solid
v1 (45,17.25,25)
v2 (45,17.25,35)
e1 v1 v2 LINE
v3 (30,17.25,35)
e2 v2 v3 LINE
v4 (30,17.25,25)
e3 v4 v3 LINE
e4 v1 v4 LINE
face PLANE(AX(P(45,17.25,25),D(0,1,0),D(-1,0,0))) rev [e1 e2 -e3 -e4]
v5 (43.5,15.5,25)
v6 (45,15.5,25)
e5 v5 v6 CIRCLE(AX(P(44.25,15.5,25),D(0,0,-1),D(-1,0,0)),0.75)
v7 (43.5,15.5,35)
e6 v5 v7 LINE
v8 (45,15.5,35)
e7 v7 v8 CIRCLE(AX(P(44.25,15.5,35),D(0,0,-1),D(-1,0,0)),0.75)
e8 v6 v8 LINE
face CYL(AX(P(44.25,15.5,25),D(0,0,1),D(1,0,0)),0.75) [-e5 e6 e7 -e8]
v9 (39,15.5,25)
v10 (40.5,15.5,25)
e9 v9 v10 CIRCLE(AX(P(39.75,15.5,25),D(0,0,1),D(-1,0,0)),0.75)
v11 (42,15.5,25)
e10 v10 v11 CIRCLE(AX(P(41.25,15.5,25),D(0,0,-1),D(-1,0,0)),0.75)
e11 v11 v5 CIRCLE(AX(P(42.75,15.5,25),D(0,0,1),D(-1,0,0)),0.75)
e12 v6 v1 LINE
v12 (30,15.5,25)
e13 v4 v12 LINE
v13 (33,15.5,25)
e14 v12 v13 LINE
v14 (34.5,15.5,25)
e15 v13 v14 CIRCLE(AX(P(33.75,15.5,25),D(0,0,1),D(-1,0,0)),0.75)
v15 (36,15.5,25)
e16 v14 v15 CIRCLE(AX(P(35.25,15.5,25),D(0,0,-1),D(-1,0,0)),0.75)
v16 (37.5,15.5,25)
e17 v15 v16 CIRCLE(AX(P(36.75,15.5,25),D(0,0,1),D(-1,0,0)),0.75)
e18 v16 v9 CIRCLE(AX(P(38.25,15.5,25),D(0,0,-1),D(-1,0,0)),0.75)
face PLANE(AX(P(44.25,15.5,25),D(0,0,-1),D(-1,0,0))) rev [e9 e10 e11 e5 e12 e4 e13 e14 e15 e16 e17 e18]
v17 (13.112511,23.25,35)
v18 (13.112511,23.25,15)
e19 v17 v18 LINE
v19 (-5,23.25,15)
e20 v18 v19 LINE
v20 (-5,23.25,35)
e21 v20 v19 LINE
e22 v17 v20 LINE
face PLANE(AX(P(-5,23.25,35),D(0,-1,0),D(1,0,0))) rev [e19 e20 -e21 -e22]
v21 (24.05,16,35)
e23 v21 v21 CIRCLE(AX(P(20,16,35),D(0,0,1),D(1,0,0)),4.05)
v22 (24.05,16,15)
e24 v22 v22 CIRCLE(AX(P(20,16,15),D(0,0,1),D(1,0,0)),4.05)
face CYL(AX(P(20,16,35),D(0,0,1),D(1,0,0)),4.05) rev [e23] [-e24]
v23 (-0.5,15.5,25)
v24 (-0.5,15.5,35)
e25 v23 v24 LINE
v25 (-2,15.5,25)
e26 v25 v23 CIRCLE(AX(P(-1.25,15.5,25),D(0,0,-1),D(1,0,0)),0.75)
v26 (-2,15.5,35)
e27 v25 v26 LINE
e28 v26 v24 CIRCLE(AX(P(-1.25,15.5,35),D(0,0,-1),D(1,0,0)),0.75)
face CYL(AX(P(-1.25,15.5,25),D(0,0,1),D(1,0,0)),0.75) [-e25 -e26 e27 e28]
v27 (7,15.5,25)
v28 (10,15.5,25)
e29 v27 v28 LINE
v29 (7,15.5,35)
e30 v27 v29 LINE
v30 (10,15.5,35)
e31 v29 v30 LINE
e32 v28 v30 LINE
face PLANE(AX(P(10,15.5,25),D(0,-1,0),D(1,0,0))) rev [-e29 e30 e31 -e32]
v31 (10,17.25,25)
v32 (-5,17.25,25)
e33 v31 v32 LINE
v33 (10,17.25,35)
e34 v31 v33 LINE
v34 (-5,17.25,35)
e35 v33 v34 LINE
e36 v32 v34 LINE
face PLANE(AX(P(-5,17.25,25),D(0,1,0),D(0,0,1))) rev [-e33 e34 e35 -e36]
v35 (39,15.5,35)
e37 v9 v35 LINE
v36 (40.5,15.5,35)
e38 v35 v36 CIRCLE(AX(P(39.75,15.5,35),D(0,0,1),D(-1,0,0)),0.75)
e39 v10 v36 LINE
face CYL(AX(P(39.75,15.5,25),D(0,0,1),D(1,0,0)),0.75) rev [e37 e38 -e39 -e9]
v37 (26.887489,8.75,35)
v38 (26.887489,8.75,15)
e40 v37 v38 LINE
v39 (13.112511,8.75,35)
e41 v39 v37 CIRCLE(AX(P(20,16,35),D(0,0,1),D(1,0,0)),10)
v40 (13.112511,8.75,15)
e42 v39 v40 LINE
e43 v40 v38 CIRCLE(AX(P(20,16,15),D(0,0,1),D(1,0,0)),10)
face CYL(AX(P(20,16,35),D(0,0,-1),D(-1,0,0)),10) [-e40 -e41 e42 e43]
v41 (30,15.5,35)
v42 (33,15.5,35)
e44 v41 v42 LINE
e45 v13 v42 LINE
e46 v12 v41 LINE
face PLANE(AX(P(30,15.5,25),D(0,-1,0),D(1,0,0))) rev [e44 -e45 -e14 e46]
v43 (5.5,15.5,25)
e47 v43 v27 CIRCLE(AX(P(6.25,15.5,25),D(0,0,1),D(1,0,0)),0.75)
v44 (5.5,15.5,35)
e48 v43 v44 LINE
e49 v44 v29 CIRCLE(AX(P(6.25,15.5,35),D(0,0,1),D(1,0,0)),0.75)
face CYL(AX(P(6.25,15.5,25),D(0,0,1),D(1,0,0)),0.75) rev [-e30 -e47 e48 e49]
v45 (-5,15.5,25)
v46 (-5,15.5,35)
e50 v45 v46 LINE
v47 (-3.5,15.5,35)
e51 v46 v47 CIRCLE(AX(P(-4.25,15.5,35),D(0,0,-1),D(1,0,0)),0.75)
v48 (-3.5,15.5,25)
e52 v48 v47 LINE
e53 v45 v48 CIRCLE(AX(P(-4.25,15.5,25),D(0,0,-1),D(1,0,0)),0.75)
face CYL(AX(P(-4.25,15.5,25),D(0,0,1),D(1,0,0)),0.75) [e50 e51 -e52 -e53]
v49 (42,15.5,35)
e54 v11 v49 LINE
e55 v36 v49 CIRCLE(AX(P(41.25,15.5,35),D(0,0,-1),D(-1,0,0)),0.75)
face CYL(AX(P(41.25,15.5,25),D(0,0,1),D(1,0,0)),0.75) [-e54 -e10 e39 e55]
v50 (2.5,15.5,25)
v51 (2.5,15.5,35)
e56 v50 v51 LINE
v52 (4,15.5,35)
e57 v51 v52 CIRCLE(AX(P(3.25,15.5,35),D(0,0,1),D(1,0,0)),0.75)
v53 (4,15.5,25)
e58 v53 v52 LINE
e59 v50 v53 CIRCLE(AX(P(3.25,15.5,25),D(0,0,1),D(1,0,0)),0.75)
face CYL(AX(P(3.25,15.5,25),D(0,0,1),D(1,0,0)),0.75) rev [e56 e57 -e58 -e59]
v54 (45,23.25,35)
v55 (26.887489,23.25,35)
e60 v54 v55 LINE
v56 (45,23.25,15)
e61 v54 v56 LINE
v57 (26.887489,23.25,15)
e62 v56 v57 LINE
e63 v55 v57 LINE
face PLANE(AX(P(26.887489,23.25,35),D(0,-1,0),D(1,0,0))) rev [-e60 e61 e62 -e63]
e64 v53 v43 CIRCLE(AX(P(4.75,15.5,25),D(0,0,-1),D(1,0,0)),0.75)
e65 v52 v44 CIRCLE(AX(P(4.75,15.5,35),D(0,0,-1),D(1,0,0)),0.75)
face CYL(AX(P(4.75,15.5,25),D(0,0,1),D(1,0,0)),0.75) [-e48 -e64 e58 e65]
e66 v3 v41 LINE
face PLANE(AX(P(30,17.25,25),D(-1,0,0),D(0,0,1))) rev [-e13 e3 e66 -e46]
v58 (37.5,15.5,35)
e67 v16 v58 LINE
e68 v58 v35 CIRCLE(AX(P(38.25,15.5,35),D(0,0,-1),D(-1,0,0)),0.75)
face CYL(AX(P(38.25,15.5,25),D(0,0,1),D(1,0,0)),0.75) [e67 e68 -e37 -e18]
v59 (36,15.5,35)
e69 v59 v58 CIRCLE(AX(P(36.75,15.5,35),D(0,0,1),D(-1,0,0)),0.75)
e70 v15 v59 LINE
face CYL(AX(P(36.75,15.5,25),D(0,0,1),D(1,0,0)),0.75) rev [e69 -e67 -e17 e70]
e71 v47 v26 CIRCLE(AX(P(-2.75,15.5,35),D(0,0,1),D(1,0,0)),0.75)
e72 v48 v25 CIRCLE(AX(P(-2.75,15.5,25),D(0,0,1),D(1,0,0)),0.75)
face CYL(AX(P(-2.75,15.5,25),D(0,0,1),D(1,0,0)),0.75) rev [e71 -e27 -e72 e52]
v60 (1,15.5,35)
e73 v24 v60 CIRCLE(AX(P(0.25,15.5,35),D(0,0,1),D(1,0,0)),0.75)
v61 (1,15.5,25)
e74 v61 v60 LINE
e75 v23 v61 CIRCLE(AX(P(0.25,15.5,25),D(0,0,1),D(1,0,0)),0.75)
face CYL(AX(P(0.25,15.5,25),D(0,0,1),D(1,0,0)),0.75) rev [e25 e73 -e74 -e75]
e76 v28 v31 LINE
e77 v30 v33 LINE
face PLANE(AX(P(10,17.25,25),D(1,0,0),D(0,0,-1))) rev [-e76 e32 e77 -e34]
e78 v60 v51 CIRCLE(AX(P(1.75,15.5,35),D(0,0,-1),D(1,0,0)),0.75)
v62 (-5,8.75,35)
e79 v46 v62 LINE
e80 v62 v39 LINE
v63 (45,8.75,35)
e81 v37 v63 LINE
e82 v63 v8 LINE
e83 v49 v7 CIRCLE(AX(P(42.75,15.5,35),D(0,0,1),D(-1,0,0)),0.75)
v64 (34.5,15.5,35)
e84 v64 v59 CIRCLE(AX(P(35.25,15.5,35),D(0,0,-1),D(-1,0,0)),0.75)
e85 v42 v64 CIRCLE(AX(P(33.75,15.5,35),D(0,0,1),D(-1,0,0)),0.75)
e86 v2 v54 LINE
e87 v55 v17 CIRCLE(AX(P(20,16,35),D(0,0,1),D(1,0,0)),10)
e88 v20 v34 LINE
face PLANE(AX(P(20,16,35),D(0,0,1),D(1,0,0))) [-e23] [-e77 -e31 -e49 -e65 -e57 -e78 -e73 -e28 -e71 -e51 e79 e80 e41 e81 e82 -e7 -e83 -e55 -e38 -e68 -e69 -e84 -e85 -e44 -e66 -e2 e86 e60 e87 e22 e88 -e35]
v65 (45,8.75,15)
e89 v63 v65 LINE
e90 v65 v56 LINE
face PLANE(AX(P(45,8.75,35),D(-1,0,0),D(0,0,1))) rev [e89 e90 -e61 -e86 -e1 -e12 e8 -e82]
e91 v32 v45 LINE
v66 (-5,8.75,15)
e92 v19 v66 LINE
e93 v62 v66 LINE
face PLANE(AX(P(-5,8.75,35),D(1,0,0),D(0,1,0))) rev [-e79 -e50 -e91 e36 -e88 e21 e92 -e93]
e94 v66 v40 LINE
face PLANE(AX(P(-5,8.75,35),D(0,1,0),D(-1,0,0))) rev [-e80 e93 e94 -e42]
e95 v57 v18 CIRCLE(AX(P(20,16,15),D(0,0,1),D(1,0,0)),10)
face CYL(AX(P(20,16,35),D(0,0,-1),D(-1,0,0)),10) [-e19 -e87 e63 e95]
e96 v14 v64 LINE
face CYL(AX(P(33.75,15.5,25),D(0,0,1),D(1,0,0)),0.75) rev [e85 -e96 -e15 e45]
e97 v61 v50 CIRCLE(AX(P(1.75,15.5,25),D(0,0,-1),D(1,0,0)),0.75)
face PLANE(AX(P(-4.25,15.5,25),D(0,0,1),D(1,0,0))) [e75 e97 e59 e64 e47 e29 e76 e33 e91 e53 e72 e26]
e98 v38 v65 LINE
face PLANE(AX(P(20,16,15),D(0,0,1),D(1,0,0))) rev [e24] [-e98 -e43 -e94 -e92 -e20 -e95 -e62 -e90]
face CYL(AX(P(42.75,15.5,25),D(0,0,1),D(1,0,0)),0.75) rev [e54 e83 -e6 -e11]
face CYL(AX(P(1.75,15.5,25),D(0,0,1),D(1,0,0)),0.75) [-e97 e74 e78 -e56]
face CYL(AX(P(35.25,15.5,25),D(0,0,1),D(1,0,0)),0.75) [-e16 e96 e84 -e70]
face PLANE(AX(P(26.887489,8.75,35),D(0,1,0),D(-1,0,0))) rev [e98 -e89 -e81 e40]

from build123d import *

# Parameters (mm, degrees)
EXTRUDE_1_DEPTH     = 20
OTHER_START         = 15
OTHER_1_OUTLINE_R   = 4.05
OTHER_1_DEPTH       = 20
CUT_EXTRUDE_1_DEPTH = 10


# Read off the part's stored shape, not the designer's step: 高级异型孔1
with BuildPart() as part:
    # 草图3 → 凸台-拉伸1 (new body)
    with BuildSketch(Plane.XY.offset(15)):
        with BuildLine():
            Line((26.887488657, 8.75), (45, 8.75))
            Line((45, 8.75), (45, 23.25))
            Line((45, 23.25), (26.887488657, 23.25))
            ThreePointArc((26.887488657, 23.25), (20, 26), (13.112511343, 23.25))
            Line((13.112511343, 23.25), (-5, 23.25))
            Line((-5, 23.25), (-5, 8.75))
            Line((-5, 8.75), (13.112511343, 8.75))
            ThreePointArc((13.112511343, 8.75), (20, 6), (26.887488657, 8.75))
        make_face()
    extrude(amount=EXTRUDE_1_DEPTH)

    # 高级异型孔1 outline → 高级异型孔1 (cut)
    with BuildSketch(Plane.XY.offset(OTHER_START)):
        with Locations((20, 16)):
            Circle(OTHER_1_OUTLINE_R)
    extrude(amount=OTHER_1_DEPTH, mode=Mode.SUBTRACT)

    # 草图6 → 切除-拉伸1 (cut)
    with BuildSketch(Plane.XY.offset(35)):
        with BuildLine():
            Line((-5, 15.5), (-5, 17.25))
            Line((-5, 17.25), (10, 17.25))
            Line((10, 17.25), (10, 15.5))
            Line((10, 15.5), (7, 15.5))
            ThreePointArc((7, 15.5), (6.25, 14.75), (5.5, 15.5))
            ThreePointArc((5.5, 15.5), (4.75, 16.25), (4, 15.5))
            ThreePointArc((4, 15.5), (3.25, 14.75), (2.5, 15.5))
            ThreePointArc((2.5, 15.5), (1.75, 16.25), (1, 15.5))
            ThreePointArc((1, 15.5), (0.25, 14.75), (-0.5, 15.5))
            ThreePointArc((-0.5, 15.5), (-1.25, 16.25), (-2, 15.5))
            ThreePointArc((-2, 15.5), (-2.75, 14.75), (-3.5, 15.5))
            ThreePointArc((-3.5, 15.5), (-4.25, 16.25), (-5, 15.5))
        make_face()
        with BuildLine():
            Line((45, 17.25), (30, 17.25))
            Line((30, 17.25), (30, 15.5))
            Line((30, 15.5), (33, 15.5))
            ThreePointArc((33, 15.5), (33.75, 14.75), (34.5, 15.5))
            ThreePointArc((34.5, 15.5), (35.25, 16.25), (36, 15.5))
            ThreePointArc((36, 15.5), (36.75, 14.75), (37.5, 15.5))
            ThreePointArc((37.5, 15.5), (38.25, 16.25), (39, 15.5))
            ThreePointArc((39, 15.5), (39.75, 14.75), (40.5, 15.5))
            ThreePointArc((40.5, 15.5), (41.25, 16.25), (42, 15.5))
            ThreePointArc((42, 15.5), (42.75, 14.75), (43.5, 15.5))
            ThreePointArc((43.5, 15.5), (44.25, 16.25), (45, 15.5))
            Line((45, 15.5), (45, 17.25))
        make_face()
    extrude(amount=-CUT_EXTRUDE_1_DEPTH, mode=Mode.SUBTRACT)


solid = part.part
